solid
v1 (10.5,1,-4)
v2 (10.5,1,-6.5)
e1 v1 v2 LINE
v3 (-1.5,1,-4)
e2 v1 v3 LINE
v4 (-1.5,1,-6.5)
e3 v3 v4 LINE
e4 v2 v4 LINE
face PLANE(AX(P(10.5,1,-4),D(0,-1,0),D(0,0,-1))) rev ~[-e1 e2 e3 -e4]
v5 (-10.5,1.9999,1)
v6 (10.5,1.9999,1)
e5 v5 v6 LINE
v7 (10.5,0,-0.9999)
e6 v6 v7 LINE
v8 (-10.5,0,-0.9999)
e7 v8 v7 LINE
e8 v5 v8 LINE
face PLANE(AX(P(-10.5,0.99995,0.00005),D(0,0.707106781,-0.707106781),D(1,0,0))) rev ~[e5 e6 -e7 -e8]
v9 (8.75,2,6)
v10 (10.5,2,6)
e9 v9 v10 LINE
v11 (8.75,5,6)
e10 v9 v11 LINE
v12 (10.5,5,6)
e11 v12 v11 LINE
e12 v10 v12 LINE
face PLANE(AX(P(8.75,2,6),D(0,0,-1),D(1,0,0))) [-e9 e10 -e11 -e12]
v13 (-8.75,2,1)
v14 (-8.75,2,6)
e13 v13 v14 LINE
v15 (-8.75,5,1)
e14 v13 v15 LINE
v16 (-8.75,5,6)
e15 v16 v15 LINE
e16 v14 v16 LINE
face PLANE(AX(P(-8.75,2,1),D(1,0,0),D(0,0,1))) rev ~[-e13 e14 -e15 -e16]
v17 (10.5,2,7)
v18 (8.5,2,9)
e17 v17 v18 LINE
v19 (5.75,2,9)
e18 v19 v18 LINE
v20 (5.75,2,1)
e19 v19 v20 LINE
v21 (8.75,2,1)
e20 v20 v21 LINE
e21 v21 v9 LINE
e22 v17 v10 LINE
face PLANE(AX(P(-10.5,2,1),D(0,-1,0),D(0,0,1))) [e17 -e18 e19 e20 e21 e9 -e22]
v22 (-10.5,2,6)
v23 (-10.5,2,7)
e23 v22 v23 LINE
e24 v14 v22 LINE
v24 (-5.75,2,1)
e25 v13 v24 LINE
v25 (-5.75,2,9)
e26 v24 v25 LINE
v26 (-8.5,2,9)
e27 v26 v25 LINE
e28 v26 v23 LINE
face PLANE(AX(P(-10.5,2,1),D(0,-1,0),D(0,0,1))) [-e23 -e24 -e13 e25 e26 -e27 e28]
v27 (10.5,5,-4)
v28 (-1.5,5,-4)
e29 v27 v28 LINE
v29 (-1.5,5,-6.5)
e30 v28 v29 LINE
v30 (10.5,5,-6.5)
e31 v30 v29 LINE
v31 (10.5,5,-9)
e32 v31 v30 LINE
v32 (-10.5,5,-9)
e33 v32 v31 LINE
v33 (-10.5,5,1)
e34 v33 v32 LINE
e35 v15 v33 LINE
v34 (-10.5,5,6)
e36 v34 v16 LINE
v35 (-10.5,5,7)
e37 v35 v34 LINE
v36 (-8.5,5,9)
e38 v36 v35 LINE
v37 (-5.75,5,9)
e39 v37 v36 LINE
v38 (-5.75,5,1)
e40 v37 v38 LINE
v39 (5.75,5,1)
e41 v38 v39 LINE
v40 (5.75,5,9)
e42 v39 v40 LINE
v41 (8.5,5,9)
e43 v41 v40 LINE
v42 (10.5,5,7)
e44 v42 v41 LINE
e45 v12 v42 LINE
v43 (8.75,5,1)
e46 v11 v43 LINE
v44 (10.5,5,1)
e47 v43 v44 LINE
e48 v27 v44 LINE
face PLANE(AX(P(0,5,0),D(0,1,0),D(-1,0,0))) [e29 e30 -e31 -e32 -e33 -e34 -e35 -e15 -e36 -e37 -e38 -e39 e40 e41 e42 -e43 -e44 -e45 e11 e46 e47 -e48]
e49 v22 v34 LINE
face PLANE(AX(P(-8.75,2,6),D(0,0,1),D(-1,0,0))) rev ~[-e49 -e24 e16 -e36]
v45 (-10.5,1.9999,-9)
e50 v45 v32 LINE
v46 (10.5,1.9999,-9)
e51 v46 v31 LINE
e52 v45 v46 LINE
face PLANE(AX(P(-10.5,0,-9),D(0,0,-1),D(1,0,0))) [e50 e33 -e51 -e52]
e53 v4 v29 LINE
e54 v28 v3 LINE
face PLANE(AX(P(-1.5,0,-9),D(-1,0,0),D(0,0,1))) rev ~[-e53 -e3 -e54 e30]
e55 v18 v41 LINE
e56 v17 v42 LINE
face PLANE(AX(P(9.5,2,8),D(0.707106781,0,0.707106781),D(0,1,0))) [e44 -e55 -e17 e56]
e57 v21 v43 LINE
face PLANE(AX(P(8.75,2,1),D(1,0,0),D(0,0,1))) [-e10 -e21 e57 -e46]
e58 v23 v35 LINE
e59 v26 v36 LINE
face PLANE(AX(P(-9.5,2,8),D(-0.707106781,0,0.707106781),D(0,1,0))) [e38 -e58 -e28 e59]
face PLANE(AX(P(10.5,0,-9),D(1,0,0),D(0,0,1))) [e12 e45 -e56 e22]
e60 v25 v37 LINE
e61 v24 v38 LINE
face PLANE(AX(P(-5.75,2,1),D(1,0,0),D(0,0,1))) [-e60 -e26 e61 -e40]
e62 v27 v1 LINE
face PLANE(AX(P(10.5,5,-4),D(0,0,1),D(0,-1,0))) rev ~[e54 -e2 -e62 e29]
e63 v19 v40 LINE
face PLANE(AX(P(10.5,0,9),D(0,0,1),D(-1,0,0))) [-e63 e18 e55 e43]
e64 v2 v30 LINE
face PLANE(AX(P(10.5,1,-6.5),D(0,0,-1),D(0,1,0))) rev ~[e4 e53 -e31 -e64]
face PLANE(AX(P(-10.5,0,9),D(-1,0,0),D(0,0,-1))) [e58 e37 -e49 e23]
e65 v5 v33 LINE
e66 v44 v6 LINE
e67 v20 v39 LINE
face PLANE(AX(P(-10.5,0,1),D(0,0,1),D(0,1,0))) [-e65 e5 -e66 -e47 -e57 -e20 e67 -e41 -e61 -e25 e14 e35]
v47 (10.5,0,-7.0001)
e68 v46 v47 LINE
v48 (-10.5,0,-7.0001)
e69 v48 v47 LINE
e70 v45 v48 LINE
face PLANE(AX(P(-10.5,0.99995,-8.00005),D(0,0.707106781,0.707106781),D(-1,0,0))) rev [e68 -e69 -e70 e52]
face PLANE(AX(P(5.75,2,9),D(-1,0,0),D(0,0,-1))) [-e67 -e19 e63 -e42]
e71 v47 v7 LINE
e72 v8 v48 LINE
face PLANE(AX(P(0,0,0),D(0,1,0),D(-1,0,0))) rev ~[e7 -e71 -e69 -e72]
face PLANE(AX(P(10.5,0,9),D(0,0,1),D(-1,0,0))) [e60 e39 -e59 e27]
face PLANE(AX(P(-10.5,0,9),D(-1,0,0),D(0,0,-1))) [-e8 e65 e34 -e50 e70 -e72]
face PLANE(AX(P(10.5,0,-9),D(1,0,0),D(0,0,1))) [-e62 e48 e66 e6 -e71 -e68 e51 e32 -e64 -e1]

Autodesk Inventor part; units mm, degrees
ref_plane "YZ Plane" through (0, 0, 0) normal (1, 0, 0) x (0, 1, 0)
ref_plane "XZ Plane" through (0, 0, 0) normal (0, 1, 0) x (-1, 0, 0)
ref_plane "XY Plane" through (0, 0, 0) normal (0, 0, 1) x (1, 0, 0)
sketch "Sketch1" plane through (0, 0, 0) normal (0, 1, 0) x (-1, 0, 0)
  line L0 (10.5, -9) -> (-10.5, -9)
  line L1 (-10.5, -9) -> (-10.5, 9)
  line L2 (-10.5, 9) -> (10.5, 9)
  line L3 (10.5, 9) -> (10.5, -9)
  point P0 (0, 0)
  point P1 (0, -9)
  point P2 (10.5, 0)
  dimension "d0" = 21
  dimension "d1" = 18
extrude "Extrusion1" add sketch "Sketch1" along normal blind 5
sketch "Sketch2" plane through (-10.5, 0, -9) normal (-1, 0, 0) x (0, 0, 1)
  line L0 (18, 0) -> (10, 0)
  line L1 (10, 0) -> (10, 2)
  line L2 (10, 2) -> (18, 2)
  line L3 (18, 2) -> (18, 0)
  point P0 (9, 0)
  dimension "d4" = 2
  dimension "d5" = 8
extrude "Extrusion2" cut sketch "Sketch2" against normal through all
sketch "Sketch3" plane through (-10.5, 2, 1) normal (0, -1, 0) x (1, 0, 0)
  line L0 (21, 8) -> (21, -10) projected
  line L1 (21, 0) -> (19.25, 0)
  line L2 (19.25, 0) -> (19.25, 5)
  line L3 (19.25, 5) -> (21, 5)
  line L4 (21, 5) -> (21, 0)
  line L5 (0, -10) -> (0, 8) projected
  line L6 (0, 0) -> (1.75, 0)
  line L7 (1.75, 0) -> (1.75, 5)
  line L8 (1.75, 5) -> (0, 5)
  line L9 (0, 5) -> (0, 0)
  line L10 (0, 8) -> (21, 8) projected
  point P0 (10.5, -1)
  point P1 (0, 5)
  dimension "d8" = 5
  dimension "d9" = 3
  dimension "d10" = 17.5
extrude "Extrusion3" cut sketch "Sketch3" against normal through all
sketch "Sketch4" plane through (-10.5, 2, 9) normal (0, -1, 0) x (1, 0, 0)
  line L0 (16.25, -8) -> (4.75, -8)
  line L1 (4.75, -8) -> (4.75, 0)
  line L2 (4.75, 0) -> (16.25, 0)
  line L3 (16.25, 0) -> (16.25, -8)
  line L4 (19.25, -8) -> (19.25, -3) projected
  line L5 (1.75, -3) -> (1.75, -8) projected
  point P0 (10.5, -9)
  point P1 (21, 0)
  point P2 (0, -8)
  dimension "d13" = 3
  dimension "d14" = 3
extrude "Extrusion4" cut sketch "Sketch4" against normal through all
chamfer "Chamfer1" distance 2 angle 45 2 edges at (10.5, 3.5, 9) (-10.5, 3.5, 9)
sketch "Sketch6" plane through (10.5, 0, -9) normal (-1, 0, 0) x (0, 0, 1)
  line L0 (10, 5) -> (0, 5) projected
  line L1 (2.5, 5) -> (5, 5)
  line L2 (5, 5) -> (5, 1)
  line L3 (5, 1) -> (2.5, 1)
  line L4 (2.5, 1) -> (2.5, 5)
  line L5 (0, 0) -> (10, 0) projected
  line L6 (10, 0) -> (10, 5) projected
  point P0 (9, 0)
  dimension "d20" = 2.5
  dimension "d22" = 1
  dimension "d23" = 5
chamfer "Chamfer2" distance 2 angle 45 2 edges at (0, 0, 1) (0, 0, -9)
extrude "Extrusion7" cut sketch "Sketch6" along normal blind 12
equation "\"d14\" = d13"
properties part number "Breakout Clip"
